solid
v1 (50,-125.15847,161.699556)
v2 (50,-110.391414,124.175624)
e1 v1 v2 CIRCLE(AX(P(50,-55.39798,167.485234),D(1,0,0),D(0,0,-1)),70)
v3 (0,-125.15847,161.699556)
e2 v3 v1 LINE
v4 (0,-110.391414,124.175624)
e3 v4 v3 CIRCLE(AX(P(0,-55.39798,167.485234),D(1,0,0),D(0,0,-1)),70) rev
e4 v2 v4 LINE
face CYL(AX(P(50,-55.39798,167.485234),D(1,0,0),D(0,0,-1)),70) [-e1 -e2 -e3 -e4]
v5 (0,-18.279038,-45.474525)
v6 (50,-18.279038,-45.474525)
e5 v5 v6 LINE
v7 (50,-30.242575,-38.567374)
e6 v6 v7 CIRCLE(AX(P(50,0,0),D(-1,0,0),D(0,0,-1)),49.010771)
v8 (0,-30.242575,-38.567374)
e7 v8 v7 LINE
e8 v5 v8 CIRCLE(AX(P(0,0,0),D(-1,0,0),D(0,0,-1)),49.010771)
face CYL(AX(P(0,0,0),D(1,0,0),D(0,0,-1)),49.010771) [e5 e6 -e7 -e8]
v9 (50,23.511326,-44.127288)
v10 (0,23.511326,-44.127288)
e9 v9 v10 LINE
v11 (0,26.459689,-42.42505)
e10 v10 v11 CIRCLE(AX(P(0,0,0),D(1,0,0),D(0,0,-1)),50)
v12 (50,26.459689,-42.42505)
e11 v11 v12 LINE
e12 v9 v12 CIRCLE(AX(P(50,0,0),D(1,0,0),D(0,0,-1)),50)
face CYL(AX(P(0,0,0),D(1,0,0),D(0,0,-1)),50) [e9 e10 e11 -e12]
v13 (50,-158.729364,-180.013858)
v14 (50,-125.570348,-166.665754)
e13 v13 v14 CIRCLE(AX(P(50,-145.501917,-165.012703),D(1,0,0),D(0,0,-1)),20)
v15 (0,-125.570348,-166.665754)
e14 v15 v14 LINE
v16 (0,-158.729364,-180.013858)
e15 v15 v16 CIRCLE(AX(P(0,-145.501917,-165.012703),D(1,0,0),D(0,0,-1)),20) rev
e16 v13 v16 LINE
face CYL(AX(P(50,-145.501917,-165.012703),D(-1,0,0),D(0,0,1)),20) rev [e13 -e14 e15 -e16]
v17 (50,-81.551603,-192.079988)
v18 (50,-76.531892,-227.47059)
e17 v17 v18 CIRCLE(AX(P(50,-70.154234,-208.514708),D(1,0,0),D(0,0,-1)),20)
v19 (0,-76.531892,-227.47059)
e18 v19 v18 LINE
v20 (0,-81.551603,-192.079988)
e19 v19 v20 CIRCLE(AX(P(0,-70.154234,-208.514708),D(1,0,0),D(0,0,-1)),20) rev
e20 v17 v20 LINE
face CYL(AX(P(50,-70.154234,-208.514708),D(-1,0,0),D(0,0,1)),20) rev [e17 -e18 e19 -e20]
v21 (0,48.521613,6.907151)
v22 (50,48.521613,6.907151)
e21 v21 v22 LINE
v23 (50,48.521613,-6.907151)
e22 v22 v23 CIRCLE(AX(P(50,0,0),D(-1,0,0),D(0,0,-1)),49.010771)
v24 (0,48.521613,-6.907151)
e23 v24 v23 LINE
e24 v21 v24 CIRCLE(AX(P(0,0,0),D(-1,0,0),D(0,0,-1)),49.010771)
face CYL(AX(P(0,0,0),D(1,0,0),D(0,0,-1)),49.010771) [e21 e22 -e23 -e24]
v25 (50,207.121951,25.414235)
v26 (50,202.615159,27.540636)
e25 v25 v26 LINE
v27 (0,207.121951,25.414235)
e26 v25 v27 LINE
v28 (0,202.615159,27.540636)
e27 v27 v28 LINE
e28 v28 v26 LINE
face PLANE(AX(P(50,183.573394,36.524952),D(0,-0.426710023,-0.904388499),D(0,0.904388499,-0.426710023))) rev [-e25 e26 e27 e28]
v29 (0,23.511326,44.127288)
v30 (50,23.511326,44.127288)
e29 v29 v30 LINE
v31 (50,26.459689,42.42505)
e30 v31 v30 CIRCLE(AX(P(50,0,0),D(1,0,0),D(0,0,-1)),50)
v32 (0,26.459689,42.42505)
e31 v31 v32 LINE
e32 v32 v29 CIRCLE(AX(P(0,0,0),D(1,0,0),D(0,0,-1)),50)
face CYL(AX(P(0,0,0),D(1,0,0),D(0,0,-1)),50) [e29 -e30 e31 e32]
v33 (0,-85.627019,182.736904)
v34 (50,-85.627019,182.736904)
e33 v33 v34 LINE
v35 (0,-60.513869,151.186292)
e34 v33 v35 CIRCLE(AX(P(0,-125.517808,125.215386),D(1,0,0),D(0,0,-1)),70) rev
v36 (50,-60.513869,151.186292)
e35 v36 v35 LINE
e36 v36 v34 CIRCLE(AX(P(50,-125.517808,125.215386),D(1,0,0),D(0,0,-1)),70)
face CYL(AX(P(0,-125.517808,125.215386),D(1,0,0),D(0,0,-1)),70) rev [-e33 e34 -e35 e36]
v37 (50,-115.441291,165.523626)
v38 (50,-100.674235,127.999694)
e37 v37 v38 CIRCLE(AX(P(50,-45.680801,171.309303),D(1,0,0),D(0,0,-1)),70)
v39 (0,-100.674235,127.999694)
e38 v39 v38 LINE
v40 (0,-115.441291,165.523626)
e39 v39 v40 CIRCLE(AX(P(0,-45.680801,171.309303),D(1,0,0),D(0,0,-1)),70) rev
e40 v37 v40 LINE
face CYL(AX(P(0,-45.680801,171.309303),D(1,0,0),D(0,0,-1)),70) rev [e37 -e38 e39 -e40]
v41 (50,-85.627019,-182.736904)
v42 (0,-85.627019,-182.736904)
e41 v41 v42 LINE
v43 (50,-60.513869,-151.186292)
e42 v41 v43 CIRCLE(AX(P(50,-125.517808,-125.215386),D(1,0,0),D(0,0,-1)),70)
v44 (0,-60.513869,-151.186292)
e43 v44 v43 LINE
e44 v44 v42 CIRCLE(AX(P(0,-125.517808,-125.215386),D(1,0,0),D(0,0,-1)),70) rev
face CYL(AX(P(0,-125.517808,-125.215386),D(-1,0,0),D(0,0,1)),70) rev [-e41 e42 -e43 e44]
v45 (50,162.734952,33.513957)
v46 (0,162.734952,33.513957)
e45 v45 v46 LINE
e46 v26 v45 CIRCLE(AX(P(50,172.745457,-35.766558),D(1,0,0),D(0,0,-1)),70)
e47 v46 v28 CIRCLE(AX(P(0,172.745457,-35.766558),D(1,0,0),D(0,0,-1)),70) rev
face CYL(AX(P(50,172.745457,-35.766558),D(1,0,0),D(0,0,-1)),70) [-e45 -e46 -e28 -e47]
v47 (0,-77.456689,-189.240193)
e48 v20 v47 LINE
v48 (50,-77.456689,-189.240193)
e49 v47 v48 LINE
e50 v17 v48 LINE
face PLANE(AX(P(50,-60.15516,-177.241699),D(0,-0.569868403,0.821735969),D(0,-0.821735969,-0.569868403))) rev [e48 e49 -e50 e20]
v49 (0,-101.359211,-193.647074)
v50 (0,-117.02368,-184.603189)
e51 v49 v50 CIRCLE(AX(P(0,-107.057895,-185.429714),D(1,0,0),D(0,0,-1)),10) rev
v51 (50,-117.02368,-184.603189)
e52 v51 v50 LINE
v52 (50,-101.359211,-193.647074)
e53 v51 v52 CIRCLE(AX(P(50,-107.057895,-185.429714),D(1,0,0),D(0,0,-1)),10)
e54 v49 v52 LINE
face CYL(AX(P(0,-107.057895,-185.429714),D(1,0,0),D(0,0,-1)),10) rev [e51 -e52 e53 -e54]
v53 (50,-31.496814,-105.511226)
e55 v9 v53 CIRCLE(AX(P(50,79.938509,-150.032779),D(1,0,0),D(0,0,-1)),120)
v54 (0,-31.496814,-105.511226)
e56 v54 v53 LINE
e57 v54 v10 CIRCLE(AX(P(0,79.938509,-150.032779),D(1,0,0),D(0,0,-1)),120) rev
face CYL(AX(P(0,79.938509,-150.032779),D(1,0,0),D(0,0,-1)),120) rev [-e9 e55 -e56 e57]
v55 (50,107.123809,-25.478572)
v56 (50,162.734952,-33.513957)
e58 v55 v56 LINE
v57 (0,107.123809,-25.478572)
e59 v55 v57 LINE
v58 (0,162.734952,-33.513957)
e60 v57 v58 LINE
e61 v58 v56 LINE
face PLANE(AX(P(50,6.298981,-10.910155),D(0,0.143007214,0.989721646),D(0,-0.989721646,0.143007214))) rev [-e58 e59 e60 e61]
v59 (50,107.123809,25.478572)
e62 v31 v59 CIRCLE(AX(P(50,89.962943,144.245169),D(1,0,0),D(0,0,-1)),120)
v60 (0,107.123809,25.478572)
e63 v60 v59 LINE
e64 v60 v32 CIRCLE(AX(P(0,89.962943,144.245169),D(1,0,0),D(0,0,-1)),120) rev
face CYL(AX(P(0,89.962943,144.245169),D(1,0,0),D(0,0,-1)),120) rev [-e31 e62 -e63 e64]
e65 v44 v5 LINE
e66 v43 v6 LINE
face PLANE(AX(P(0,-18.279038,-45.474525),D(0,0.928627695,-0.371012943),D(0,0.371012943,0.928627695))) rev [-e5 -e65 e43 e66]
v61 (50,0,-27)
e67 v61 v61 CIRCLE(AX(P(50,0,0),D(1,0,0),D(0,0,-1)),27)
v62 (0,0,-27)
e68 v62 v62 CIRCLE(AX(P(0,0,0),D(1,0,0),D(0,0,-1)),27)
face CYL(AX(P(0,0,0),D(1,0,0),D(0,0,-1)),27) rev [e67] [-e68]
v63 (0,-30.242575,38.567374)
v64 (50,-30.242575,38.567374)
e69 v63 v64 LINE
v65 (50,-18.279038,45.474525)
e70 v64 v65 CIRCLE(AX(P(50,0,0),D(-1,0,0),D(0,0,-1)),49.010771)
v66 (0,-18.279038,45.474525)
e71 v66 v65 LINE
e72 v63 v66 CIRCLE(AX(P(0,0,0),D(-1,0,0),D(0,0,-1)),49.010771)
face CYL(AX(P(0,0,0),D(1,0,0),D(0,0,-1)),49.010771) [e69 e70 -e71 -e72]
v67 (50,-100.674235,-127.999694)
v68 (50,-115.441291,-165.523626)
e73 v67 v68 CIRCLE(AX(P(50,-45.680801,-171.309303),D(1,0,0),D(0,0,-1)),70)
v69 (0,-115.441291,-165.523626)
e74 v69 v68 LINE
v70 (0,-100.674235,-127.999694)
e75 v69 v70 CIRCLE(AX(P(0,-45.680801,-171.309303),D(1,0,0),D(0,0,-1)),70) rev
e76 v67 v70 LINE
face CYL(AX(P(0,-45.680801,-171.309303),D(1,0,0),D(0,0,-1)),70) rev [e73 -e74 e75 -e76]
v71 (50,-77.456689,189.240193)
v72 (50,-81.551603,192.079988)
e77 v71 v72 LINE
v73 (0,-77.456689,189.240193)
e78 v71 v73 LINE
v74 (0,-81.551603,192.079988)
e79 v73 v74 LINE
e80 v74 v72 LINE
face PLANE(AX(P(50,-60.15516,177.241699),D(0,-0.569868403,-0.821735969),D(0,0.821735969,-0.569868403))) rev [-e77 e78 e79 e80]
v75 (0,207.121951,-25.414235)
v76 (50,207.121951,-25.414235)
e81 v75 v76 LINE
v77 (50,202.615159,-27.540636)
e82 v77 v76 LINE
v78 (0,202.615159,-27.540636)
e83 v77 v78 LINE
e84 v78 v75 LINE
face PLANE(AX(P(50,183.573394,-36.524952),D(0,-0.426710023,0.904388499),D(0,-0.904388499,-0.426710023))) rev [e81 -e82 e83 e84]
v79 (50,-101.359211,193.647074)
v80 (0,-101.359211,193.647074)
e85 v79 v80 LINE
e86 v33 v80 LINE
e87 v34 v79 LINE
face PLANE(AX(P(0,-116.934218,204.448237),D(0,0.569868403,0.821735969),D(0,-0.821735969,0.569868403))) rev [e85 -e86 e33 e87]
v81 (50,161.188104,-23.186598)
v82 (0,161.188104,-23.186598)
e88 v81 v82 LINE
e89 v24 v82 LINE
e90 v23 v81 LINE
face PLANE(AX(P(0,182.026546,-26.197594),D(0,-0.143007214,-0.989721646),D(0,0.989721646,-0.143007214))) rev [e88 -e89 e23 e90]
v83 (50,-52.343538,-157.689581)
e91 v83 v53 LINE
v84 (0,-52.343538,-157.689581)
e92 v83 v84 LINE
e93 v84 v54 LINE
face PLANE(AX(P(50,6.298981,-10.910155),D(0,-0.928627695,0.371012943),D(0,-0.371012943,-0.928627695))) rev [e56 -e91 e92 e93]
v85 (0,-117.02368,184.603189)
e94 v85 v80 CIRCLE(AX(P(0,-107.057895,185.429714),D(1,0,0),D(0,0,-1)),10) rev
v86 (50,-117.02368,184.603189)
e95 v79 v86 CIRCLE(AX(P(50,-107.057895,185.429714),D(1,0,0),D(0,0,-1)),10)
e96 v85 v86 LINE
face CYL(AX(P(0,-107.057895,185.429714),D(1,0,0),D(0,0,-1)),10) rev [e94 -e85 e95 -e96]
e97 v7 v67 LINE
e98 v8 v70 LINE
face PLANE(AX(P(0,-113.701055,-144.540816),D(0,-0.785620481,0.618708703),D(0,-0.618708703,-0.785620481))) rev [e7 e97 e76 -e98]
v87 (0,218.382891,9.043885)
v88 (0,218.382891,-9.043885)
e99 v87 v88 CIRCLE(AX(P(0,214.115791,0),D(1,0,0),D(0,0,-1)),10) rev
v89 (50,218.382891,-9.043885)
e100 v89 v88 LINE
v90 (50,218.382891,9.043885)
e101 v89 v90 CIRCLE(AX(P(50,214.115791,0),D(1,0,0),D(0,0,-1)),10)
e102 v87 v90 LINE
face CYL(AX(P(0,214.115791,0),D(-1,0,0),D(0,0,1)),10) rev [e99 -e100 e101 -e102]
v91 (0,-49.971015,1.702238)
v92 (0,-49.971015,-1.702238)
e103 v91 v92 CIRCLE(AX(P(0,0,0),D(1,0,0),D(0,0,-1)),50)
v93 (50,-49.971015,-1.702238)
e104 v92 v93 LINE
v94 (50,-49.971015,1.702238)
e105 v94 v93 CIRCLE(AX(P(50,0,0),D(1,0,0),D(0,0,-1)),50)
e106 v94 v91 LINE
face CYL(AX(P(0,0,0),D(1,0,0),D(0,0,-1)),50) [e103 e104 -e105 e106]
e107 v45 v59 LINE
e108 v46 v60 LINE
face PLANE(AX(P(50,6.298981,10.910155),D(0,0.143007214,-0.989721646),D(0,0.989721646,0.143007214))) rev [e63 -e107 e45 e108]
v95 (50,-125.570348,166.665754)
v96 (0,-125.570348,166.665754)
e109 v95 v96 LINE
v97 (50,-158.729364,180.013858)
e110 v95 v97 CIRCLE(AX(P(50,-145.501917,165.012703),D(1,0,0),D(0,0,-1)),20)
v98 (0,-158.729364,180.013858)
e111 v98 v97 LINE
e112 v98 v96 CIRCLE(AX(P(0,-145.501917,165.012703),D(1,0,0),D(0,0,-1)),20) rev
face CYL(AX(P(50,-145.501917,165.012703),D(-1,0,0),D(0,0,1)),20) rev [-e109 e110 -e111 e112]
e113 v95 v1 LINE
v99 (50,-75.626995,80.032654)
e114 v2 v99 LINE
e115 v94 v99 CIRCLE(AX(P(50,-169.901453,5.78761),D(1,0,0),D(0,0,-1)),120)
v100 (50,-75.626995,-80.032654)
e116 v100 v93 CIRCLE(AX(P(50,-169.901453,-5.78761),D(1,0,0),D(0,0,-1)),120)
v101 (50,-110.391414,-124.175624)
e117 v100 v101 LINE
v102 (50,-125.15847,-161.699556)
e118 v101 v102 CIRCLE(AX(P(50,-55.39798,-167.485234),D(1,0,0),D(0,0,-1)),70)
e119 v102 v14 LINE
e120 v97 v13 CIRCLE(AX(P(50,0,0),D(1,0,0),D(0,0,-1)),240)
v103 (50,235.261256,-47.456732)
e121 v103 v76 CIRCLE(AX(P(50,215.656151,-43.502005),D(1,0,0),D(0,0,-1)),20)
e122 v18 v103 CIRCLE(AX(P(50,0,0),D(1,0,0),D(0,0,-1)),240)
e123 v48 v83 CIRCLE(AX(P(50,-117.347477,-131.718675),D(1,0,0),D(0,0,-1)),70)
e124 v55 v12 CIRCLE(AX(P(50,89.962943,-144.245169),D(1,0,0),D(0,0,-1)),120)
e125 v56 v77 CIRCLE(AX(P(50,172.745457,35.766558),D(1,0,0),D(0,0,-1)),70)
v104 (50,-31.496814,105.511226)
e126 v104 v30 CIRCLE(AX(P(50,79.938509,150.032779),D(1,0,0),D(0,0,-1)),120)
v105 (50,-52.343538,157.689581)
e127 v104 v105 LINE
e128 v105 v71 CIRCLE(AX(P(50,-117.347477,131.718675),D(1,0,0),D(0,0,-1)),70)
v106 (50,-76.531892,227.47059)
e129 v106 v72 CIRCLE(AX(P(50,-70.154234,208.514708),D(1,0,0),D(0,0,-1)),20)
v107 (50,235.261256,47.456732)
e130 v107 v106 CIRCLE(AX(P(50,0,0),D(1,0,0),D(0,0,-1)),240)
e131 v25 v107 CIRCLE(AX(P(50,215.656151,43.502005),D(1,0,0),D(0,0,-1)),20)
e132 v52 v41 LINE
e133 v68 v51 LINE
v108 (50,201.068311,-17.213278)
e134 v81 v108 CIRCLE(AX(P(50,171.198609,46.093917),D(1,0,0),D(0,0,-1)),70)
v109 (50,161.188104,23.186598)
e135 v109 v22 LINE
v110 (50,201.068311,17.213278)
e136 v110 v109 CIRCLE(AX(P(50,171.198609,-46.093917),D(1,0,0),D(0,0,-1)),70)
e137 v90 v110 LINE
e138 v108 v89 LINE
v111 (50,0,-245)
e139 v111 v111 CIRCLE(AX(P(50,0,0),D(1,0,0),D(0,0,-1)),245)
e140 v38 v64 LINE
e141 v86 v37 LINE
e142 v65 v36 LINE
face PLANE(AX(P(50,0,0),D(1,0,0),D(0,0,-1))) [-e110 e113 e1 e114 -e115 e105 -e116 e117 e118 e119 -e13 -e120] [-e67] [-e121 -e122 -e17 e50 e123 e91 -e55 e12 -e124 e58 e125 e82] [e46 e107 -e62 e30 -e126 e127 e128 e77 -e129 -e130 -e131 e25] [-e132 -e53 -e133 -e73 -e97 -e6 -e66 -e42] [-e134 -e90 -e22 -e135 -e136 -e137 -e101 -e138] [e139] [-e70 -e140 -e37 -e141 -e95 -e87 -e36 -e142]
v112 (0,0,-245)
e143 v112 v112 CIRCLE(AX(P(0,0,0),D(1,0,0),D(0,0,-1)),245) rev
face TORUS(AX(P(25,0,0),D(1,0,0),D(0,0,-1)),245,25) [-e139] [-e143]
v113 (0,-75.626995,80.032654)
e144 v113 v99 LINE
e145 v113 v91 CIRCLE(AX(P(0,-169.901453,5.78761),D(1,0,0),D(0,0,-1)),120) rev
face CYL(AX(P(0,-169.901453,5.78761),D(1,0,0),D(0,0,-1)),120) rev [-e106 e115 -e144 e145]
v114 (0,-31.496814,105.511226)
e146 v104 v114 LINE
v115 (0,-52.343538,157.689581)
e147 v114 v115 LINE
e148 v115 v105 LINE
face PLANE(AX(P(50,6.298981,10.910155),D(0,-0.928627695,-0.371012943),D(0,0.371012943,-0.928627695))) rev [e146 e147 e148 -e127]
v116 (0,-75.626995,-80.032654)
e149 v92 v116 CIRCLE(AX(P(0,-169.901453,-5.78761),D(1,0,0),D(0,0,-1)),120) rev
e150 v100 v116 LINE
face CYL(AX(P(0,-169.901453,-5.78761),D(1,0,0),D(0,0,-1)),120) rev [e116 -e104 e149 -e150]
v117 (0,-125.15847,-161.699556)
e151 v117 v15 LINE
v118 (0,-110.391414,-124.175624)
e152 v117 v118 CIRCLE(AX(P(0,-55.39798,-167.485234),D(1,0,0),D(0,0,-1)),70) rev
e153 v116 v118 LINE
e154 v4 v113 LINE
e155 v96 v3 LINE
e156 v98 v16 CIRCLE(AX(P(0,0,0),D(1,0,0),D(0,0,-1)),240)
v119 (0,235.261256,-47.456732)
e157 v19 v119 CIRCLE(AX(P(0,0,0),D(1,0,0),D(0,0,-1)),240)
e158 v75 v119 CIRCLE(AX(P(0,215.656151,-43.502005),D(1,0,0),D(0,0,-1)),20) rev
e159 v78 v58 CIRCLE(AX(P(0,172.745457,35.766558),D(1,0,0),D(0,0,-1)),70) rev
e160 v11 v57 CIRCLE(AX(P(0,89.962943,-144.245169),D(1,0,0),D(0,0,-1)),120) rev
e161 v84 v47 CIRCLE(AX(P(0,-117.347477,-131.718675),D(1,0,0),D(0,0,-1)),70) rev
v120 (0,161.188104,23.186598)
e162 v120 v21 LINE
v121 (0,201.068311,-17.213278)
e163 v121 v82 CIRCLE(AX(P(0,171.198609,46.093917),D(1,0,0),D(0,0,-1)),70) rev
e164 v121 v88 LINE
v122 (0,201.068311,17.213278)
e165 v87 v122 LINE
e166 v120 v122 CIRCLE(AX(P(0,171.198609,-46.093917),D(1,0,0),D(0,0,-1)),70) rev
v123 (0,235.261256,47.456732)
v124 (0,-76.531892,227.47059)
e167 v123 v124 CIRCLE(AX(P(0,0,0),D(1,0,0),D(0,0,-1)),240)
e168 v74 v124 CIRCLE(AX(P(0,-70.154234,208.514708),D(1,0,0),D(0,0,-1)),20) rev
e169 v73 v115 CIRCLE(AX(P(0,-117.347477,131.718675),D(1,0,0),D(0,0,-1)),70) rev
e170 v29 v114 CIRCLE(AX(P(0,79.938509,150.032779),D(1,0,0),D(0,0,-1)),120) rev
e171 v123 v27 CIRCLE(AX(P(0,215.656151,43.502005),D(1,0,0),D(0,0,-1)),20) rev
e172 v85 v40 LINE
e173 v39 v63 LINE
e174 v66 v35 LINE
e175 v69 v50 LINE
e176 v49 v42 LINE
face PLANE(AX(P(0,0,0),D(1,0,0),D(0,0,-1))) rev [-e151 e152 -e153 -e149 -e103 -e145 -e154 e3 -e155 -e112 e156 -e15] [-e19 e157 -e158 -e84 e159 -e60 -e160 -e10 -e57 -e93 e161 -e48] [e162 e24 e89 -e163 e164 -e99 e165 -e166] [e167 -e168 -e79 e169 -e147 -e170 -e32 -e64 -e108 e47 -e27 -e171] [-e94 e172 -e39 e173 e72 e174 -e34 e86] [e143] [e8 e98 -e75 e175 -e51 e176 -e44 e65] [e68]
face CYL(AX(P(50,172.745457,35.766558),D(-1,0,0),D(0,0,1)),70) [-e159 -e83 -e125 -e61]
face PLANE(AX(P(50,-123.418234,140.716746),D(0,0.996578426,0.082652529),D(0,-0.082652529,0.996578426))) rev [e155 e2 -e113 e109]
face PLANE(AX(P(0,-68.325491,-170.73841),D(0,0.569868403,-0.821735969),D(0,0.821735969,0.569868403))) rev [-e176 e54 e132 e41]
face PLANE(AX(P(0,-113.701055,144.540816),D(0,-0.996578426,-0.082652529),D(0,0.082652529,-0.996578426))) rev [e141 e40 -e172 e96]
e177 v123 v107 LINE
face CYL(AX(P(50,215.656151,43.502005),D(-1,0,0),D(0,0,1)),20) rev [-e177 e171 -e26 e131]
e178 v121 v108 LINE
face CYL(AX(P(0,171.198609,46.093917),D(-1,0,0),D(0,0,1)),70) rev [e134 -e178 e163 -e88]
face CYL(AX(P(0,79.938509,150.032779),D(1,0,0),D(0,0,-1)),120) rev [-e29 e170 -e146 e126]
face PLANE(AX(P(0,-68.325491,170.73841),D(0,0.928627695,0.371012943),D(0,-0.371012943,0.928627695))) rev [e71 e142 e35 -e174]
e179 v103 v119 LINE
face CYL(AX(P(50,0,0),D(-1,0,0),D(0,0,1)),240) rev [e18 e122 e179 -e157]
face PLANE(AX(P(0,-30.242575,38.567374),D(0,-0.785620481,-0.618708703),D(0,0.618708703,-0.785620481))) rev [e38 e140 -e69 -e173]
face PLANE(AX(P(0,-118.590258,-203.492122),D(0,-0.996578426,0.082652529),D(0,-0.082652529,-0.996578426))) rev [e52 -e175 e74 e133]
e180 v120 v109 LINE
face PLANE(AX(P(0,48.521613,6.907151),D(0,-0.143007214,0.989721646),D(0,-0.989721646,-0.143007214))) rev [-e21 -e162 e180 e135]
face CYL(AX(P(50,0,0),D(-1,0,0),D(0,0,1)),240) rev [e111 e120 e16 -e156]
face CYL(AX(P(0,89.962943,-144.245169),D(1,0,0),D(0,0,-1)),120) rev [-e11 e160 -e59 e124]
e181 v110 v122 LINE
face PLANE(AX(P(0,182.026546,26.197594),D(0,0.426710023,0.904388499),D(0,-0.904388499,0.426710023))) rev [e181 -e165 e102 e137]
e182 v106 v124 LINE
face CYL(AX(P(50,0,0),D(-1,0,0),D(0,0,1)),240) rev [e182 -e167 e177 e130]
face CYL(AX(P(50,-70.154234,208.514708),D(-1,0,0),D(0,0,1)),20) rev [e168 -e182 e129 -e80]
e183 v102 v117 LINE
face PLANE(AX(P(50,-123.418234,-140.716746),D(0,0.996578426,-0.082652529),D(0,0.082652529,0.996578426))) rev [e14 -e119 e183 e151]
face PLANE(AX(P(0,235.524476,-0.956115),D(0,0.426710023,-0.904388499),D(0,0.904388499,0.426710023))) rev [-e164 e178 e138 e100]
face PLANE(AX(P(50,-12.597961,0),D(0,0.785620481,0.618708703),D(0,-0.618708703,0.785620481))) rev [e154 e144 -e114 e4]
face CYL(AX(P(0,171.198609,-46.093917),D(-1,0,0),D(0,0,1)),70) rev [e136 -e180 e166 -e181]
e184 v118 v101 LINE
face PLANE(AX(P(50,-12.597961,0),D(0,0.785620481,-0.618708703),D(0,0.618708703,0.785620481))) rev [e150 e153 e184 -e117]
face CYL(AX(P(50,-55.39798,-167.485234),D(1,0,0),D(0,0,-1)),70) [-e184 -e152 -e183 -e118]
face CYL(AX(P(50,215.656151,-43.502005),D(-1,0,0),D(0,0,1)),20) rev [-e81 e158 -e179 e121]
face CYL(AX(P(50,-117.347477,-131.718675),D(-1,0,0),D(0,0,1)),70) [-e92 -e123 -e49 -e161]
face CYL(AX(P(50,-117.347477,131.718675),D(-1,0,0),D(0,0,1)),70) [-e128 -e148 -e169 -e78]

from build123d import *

# Parameters (mm, degrees)
SKETCH1_R           = 270
SKETCH1_R_2         = 240
BOSS_EXTRUDE1_DEPTH = 50
FILLET1_R           = 25
BOSS_EXTRUDE2_DEPTH = 50
SKETCH3_R           = 50
BOSS_EXTRUDE3_DEPTH = 50
SKETCH4_R           = 27
CUT_EXTRUDE1_DEPTH  = 50
SKETCH5_R           = 27
CUT_EXTRUDE2_DEPTH  = 50
FILLET2_R           = 120
FILLET3_R           = 120
FILLET4_R           = 120
FILLET5_R           = 120
FILLET6_R           = 120
FILLET7_R           = 120
FILLET8_R           = 70
FILLET9_R           = 70
FILLET10_R          = 70
FILLET11_R          = 70
FILLET12_R          = 70
FILLET13_R          = 70
FILLET14_R          = 70
FILLET15_R          = 70
FILLET16_R          = 70
FILLET17_R          = 70
FILLET18_R          = 70
FILLET19_R          = 70
FILLET20_R          = 20
FILLET21_R          = 20
FILLET22_R          = 20
FILLET23_R          = 20
FILLET24_R          = 20
FILLET25_R          = 20
FILLET26_R          = 10
FILLET27_R          = 10
FILLET28_R          = 10


with BuildPart() as part:
    # Sketch1 → Boss-Extrude1 (new body)
    with BuildSketch(Plane(origin=(0, 0, 0), x_dir=(0, 0, -1), z_dir=(1, 0, 0))):
        Circle(SKETCH1_R)
        Circle(SKETCH1_R_2, mode=Mode.SUBTRACT)
    extrude(amount=BOSS_EXTRUDE1_DEPTH)

    # Fillet1
    fillet1_edges = [part.edges().sort_by_distance(p)[0] for p in [
        (0, 0, 270),
        (50, 0, 270),
    ]]
    fillet(fillet1_edges, radius=FILLET1_R - 0.0001)  # a hair under: the kernel refuses the full size

    # Sketch2 → Boss-Extrude2 (add)
    with BuildSketch(Plane(origin=(0, 0, 0), x_dir=(0, 0, -1), z_dir=(1, 0, 0))):
        with BuildLine():
            Line((10.910154565, 6.298980675), (36.524952377, 183.573393863))
            Line((36.524952377, 183.573393863), (10, 239.791576166))
            ThreePointArc((10, 239.791576166), (0, 240), (-10, 239.791576166))
            Line((-10, 239.791576166), (-36.524952377, 183.573393863))
            Line((-36.524952377, 183.573393863), (-10.910154565, 6.298980675))
            Line((-10.910154565, 6.298980675), (-177.241698733, -60.155160301))
            Line((-177.241698733, -60.155160301), (-212.665596573, -111.235534045))
            ThreePointArc((-212.665596573, -111.235534045), (-207.846096908, -120), (-202.665596573, -128.556042121))
            Line((-202.665596573, -128.556042121), (-140.716746356, -123.418233562))
            Line((-140.716746356, -123.418233562), (0, -12.59796135))
            Line((0, -12.59796135), (140.716746356, -123.418233562))
            Line((140.716746356, -123.418233562), (202.665596573, -128.556042121))
            ThreePointArc((202.665596573, -128.556042121), (207.846096908, -120), (212.665596573, -111.235534045))
            Line((212.665596573, -111.235534045), (177.241698733, -60.155160301))
            Line((177.241698733, -60.155160301), (10.910154565, 6.298980675))
        make_face()
    extrude(amount=BOSS_EXTRUDE2_DEPTH)

    # Sketch3 → Boss-Extrude3 (add)
    with BuildSketch(Plane(origin=(50, 0, 0), x_dir=(0, 0, -1), z_dir=(1, 0, 0))):
        Circle(SKETCH3_R)
    extrude(amount=-BOSS_EXTRUDE3_DEPTH)

    # Sketch4 → Cut-Extrude1 (cut)
    with BuildSketch(Plane(origin=(50, 0, 0), x_dir=(0, 0, -1), z_dir=(1, 0, 0))):
        Circle(SKETCH4_R)
    extrude(amount=-CUT_EXTRUDE1_DEPTH, mode=Mode.SUBTRACT)

    # Sketch5 → Cut-Extrude2 (cut)
    with BuildSketch(Plane(origin=(50, 0, 0), x_dir=(0, 0, -1), z_dir=(1, 0, 0))):
        Circle(SKETCH5_R)
        with BuildLine():
            Line((-6.907151282, 48.521613039), (-26.197593694, 182.026545767))
            Line((-26.197593694, 182.026545767), (-0.956115014, 235.524475937))
            Line((-0.956115014, 235.524475937), (0, 237.550909289))
            Line((0, 237.550909289), (0.956115014, 235.524475937))
            Line((0.956115014, 235.524475937), (26.197593694, 182.026545767))
            Line((26.197593694, 182.026545767), (6.907151282, 48.521613039))
            ThreePointArc((6.907151282, 48.521613039), (0, 49.010770967), (-6.907151282, 48.521613039))
        make_face()
        with BuildLine():
            Line((45.474525166, -18.279038041), (170.738409645, -68.325491226))
            Line((170.738409645, -68.325491226), (204.448236882, -116.934218077))
            Line((204.448236882, -116.934218077), (205.725122137, -118.775454645))
            Line((205.725122137, -118.775454645), (203.492121867, -118.59025786))
            Line((203.492121867, -118.59025786), (144.54081595, -113.701054541))
            Line((144.54081595, -113.701054541), (38.567373883, -30.242574998))
            ThreePointArc((38.567373883, -30.242574998), (42.444572716, -24.505385483), (45.474525166, -18.279038041))
        make_face()
        with BuildLine():
            Line((-38.567373883, -30.242574998), (-144.54081595, -113.701054541))
            Line((-144.54081595, -113.701054541), (-203.492121867, -118.59025786))
            Line((-203.492121867, -118.59025786), (-205.725122137, -118.775454645))
            Line((-205.725122137, -118.775454645), (-204.448236882, -116.934218077))
            Line((-204.448236882, -116.934218077), (-170.738409645, -68.325491226))
            Line((-170.738409645, -68.325491226), (-45.474525166, -18.279038041))
            ThreePointArc((-45.474525166, -18.279038041), (-42.444572716, -24.505385483), (-38.567373883, -30.242574998))
        make_face()
    extrude(amount=-CUT_EXTRUDE2_DEPTH, mode=Mode.SUBTRACT)

    # Fillet2
    fillet2_edges = [part.edges().sort_by_distance(p)[0] for p in [
        (25, -38.098779813, -32.380286854),
    ]]
    fillet(fillet2_edges, radius=FILLET2_R)

    # Fillet3
    fillet3_edges = [part.edges().sort_by_distance(p)[0] for p in [
        (25, -8.992761091, -49.184654598),
    ]]
    fillet(fillet3_edges, radius=FILLET3_R)

    # Fillet4
    fillet4_edges = [part.edges().sort_by_distance(p)[0] for p in [
        (25, -38.098779813, 32.380286854),
    ]]
    fillet(fillet4_edges, radius=FILLET4_R)

    # Fillet5
    fillet5_edges = [part.edges().sort_by_distance(p)[0] for p in [
        (25, -8.992761091, 49.184654598),
    ]]
    fillet(fillet5_edges, radius=FILLET5_R)

    # Fillet6
    fillet6_edges = [part.edges().sort_by_distance(p)[0] for p in [
        (25, 47.091540904, 16.804367744),
    ]]
    fillet(fillet6_edges, radius=FILLET6_R)

    # Fillet7
    fillet7_edges = [part.edges().sort_by_distance(p)[0] for p in [
        (25, 47.091540904, -16.804367744),
    ]]
    fillet(fillet7_edges, radius=FILLET7_R)

    # Fillet8
    fillet8_edges = [part.edges().sort_by_distance(p)[0] for p in [
        (25, -123.418233562, -140.716746356),
    ]]
    fillet(fillet8_edges, radius=FILLET8_R)

    # Fillet9
    fillet9_edges = [part.edges().sort_by_distance(p)[0] for p in [
        (25, -60.155160301, -177.241698733),
    ]]
    fillet(fillet9_edges, radius=FILLET9_R)

    # Fillet10
    fillet10_edges = [part.edges().sort_by_distance(p)[0] for p in [
        (25, -123.418233562, 140.716746356),
    ]]
    fillet(fillet10_edges, radius=FILLET10_R)

    # Fillet11
    fillet11_edges = [part.edges().sort_by_distance(p)[0] for p in [
        (25, -60.155160301, 177.241698733),
    ]]
    fillet(fillet11_edges, radius=FILLET11_R)

    # Fillet12
    fillet12_edges = [part.edges().sort_by_distance(p)[0] for p in [
        (25, 183.573393863, 36.524952377),
    ]]
    fillet(fillet12_edges, radius=FILLET12_R)

    # Fillet13
    fillet13_edges = [part.edges().sort_by_distance(p)[0] for p in [
        (25, 183.573393863, -36.524952377),
    ]]
    fillet(fillet13_edges, radius=FILLET13_R)

    # Fillet14
    fillet14_edges = [part.edges().sort_by_distance(p)[0] for p in [
        (25, -113.701054541, -144.54081595),
    ]]
    fillet(fillet14_edges, radius=FILLET14_R)

    # Fillet15
    fillet15_edges = [part.edges().sort_by_distance(p)[0] for p in [
        (25, -68.325491226, -170.738409645),
    ]]
    fillet(fillet15_edges, radius=FILLET15_R)

    # Fillet16
    fillet16_edges = [part.edges().sort_by_distance(p)[0] for p in [
        (25, -68.325491226, 170.738409645),
    ]]
    fillet(fillet16_edges, radius=FILLET16_R)

    # Fillet17
    fillet17_edges = [part.edges().sort_by_distance(p)[0] for p in [
        (25, -113.701054541, 144.54081595),
    ]]
    fillet(fillet17_edges, radius=FILLET17_R)

    # Fillet18
    fillet18_edges = [part.edges().sort_by_distance(p)[0] for p in [
        (25, 182.026545767, -26.197593694),
    ]]
    fillet(fillet18_edges, radius=FILLET18_R)

    # Fillet19
    fillet19_edges = [part.edges().sort_by_distance(p)[0] for p in [
        (25, 182.026545767, 26.197593694),
    ]]
    fillet(fillet19_edges, radius=FILLET19_R)

    # Fillet20
    fillet20_edges = [part.edges().sort_by_distance(p)[0] for p in [
        (25, 239.791576166, -10),
    ]]
    fillet(fillet20_edges, radius=FILLET20_R)

    # Fillet21
    fillet21_edges = [part.edges().sort_by_distance(p)[0] for p in [
        (25, 239.791576166, 10),
    ]]
    fillet(fillet21_edges, radius=FILLET21_R)

    # Fillet22
    fillet22_edges = [part.edges().sort_by_distance(p)[0] for p in [
        (25, -111.235534045, -212.665596573),
    ]]
    fillet(fillet22_edges, radius=FILLET22_R)

    # Fillet23
    fillet23_edges = [part.edges().sort_by_distance(p)[0] for p in [
        (25, -128.556042121, -202.665596573),
    ]]
    fillet(fillet23_edges, radius=FILLET23_R)

    # Fillet24
    fillet24_edges = [part.edges().sort_by_distance(p)[0] for p in [
        (25, -128.556042121, 202.665596573),
    ]]
    fillet(fillet24_edges, radius=FILLET24_R)

    # Fillet25
    fillet25_edges = [part.edges().sort_by_distance(p)[0] for p in [
        (25, -111.235534045, 212.665596573),
    ]]
    fillet(fillet25_edges, radius=FILLET25_R)

    # Fillet26
    fillet26_edges = [part.edges().sort_by_distance(p)[0] for p in [
        (25, -118.775454645, -205.725122137),
    ]]
    fillet(fillet26_edges, radius=FILLET26_R)

    # Fillet27
    fillet27_edges = [part.edges().sort_by_distance(p)[0] for p in [
        (25, -118.775454645, 205.725122137),
    ]]
    fillet(fillet27_edges, radius=FILLET27_R)

    # Fillet28
    fillet28_edges = [part.edges().sort_by_distance(p)[0] for p in [
        (25, 237.550909289, 0),
    ]]
    fillet(fillet28_edges, radius=FILLET28_R)


solid = part.part
